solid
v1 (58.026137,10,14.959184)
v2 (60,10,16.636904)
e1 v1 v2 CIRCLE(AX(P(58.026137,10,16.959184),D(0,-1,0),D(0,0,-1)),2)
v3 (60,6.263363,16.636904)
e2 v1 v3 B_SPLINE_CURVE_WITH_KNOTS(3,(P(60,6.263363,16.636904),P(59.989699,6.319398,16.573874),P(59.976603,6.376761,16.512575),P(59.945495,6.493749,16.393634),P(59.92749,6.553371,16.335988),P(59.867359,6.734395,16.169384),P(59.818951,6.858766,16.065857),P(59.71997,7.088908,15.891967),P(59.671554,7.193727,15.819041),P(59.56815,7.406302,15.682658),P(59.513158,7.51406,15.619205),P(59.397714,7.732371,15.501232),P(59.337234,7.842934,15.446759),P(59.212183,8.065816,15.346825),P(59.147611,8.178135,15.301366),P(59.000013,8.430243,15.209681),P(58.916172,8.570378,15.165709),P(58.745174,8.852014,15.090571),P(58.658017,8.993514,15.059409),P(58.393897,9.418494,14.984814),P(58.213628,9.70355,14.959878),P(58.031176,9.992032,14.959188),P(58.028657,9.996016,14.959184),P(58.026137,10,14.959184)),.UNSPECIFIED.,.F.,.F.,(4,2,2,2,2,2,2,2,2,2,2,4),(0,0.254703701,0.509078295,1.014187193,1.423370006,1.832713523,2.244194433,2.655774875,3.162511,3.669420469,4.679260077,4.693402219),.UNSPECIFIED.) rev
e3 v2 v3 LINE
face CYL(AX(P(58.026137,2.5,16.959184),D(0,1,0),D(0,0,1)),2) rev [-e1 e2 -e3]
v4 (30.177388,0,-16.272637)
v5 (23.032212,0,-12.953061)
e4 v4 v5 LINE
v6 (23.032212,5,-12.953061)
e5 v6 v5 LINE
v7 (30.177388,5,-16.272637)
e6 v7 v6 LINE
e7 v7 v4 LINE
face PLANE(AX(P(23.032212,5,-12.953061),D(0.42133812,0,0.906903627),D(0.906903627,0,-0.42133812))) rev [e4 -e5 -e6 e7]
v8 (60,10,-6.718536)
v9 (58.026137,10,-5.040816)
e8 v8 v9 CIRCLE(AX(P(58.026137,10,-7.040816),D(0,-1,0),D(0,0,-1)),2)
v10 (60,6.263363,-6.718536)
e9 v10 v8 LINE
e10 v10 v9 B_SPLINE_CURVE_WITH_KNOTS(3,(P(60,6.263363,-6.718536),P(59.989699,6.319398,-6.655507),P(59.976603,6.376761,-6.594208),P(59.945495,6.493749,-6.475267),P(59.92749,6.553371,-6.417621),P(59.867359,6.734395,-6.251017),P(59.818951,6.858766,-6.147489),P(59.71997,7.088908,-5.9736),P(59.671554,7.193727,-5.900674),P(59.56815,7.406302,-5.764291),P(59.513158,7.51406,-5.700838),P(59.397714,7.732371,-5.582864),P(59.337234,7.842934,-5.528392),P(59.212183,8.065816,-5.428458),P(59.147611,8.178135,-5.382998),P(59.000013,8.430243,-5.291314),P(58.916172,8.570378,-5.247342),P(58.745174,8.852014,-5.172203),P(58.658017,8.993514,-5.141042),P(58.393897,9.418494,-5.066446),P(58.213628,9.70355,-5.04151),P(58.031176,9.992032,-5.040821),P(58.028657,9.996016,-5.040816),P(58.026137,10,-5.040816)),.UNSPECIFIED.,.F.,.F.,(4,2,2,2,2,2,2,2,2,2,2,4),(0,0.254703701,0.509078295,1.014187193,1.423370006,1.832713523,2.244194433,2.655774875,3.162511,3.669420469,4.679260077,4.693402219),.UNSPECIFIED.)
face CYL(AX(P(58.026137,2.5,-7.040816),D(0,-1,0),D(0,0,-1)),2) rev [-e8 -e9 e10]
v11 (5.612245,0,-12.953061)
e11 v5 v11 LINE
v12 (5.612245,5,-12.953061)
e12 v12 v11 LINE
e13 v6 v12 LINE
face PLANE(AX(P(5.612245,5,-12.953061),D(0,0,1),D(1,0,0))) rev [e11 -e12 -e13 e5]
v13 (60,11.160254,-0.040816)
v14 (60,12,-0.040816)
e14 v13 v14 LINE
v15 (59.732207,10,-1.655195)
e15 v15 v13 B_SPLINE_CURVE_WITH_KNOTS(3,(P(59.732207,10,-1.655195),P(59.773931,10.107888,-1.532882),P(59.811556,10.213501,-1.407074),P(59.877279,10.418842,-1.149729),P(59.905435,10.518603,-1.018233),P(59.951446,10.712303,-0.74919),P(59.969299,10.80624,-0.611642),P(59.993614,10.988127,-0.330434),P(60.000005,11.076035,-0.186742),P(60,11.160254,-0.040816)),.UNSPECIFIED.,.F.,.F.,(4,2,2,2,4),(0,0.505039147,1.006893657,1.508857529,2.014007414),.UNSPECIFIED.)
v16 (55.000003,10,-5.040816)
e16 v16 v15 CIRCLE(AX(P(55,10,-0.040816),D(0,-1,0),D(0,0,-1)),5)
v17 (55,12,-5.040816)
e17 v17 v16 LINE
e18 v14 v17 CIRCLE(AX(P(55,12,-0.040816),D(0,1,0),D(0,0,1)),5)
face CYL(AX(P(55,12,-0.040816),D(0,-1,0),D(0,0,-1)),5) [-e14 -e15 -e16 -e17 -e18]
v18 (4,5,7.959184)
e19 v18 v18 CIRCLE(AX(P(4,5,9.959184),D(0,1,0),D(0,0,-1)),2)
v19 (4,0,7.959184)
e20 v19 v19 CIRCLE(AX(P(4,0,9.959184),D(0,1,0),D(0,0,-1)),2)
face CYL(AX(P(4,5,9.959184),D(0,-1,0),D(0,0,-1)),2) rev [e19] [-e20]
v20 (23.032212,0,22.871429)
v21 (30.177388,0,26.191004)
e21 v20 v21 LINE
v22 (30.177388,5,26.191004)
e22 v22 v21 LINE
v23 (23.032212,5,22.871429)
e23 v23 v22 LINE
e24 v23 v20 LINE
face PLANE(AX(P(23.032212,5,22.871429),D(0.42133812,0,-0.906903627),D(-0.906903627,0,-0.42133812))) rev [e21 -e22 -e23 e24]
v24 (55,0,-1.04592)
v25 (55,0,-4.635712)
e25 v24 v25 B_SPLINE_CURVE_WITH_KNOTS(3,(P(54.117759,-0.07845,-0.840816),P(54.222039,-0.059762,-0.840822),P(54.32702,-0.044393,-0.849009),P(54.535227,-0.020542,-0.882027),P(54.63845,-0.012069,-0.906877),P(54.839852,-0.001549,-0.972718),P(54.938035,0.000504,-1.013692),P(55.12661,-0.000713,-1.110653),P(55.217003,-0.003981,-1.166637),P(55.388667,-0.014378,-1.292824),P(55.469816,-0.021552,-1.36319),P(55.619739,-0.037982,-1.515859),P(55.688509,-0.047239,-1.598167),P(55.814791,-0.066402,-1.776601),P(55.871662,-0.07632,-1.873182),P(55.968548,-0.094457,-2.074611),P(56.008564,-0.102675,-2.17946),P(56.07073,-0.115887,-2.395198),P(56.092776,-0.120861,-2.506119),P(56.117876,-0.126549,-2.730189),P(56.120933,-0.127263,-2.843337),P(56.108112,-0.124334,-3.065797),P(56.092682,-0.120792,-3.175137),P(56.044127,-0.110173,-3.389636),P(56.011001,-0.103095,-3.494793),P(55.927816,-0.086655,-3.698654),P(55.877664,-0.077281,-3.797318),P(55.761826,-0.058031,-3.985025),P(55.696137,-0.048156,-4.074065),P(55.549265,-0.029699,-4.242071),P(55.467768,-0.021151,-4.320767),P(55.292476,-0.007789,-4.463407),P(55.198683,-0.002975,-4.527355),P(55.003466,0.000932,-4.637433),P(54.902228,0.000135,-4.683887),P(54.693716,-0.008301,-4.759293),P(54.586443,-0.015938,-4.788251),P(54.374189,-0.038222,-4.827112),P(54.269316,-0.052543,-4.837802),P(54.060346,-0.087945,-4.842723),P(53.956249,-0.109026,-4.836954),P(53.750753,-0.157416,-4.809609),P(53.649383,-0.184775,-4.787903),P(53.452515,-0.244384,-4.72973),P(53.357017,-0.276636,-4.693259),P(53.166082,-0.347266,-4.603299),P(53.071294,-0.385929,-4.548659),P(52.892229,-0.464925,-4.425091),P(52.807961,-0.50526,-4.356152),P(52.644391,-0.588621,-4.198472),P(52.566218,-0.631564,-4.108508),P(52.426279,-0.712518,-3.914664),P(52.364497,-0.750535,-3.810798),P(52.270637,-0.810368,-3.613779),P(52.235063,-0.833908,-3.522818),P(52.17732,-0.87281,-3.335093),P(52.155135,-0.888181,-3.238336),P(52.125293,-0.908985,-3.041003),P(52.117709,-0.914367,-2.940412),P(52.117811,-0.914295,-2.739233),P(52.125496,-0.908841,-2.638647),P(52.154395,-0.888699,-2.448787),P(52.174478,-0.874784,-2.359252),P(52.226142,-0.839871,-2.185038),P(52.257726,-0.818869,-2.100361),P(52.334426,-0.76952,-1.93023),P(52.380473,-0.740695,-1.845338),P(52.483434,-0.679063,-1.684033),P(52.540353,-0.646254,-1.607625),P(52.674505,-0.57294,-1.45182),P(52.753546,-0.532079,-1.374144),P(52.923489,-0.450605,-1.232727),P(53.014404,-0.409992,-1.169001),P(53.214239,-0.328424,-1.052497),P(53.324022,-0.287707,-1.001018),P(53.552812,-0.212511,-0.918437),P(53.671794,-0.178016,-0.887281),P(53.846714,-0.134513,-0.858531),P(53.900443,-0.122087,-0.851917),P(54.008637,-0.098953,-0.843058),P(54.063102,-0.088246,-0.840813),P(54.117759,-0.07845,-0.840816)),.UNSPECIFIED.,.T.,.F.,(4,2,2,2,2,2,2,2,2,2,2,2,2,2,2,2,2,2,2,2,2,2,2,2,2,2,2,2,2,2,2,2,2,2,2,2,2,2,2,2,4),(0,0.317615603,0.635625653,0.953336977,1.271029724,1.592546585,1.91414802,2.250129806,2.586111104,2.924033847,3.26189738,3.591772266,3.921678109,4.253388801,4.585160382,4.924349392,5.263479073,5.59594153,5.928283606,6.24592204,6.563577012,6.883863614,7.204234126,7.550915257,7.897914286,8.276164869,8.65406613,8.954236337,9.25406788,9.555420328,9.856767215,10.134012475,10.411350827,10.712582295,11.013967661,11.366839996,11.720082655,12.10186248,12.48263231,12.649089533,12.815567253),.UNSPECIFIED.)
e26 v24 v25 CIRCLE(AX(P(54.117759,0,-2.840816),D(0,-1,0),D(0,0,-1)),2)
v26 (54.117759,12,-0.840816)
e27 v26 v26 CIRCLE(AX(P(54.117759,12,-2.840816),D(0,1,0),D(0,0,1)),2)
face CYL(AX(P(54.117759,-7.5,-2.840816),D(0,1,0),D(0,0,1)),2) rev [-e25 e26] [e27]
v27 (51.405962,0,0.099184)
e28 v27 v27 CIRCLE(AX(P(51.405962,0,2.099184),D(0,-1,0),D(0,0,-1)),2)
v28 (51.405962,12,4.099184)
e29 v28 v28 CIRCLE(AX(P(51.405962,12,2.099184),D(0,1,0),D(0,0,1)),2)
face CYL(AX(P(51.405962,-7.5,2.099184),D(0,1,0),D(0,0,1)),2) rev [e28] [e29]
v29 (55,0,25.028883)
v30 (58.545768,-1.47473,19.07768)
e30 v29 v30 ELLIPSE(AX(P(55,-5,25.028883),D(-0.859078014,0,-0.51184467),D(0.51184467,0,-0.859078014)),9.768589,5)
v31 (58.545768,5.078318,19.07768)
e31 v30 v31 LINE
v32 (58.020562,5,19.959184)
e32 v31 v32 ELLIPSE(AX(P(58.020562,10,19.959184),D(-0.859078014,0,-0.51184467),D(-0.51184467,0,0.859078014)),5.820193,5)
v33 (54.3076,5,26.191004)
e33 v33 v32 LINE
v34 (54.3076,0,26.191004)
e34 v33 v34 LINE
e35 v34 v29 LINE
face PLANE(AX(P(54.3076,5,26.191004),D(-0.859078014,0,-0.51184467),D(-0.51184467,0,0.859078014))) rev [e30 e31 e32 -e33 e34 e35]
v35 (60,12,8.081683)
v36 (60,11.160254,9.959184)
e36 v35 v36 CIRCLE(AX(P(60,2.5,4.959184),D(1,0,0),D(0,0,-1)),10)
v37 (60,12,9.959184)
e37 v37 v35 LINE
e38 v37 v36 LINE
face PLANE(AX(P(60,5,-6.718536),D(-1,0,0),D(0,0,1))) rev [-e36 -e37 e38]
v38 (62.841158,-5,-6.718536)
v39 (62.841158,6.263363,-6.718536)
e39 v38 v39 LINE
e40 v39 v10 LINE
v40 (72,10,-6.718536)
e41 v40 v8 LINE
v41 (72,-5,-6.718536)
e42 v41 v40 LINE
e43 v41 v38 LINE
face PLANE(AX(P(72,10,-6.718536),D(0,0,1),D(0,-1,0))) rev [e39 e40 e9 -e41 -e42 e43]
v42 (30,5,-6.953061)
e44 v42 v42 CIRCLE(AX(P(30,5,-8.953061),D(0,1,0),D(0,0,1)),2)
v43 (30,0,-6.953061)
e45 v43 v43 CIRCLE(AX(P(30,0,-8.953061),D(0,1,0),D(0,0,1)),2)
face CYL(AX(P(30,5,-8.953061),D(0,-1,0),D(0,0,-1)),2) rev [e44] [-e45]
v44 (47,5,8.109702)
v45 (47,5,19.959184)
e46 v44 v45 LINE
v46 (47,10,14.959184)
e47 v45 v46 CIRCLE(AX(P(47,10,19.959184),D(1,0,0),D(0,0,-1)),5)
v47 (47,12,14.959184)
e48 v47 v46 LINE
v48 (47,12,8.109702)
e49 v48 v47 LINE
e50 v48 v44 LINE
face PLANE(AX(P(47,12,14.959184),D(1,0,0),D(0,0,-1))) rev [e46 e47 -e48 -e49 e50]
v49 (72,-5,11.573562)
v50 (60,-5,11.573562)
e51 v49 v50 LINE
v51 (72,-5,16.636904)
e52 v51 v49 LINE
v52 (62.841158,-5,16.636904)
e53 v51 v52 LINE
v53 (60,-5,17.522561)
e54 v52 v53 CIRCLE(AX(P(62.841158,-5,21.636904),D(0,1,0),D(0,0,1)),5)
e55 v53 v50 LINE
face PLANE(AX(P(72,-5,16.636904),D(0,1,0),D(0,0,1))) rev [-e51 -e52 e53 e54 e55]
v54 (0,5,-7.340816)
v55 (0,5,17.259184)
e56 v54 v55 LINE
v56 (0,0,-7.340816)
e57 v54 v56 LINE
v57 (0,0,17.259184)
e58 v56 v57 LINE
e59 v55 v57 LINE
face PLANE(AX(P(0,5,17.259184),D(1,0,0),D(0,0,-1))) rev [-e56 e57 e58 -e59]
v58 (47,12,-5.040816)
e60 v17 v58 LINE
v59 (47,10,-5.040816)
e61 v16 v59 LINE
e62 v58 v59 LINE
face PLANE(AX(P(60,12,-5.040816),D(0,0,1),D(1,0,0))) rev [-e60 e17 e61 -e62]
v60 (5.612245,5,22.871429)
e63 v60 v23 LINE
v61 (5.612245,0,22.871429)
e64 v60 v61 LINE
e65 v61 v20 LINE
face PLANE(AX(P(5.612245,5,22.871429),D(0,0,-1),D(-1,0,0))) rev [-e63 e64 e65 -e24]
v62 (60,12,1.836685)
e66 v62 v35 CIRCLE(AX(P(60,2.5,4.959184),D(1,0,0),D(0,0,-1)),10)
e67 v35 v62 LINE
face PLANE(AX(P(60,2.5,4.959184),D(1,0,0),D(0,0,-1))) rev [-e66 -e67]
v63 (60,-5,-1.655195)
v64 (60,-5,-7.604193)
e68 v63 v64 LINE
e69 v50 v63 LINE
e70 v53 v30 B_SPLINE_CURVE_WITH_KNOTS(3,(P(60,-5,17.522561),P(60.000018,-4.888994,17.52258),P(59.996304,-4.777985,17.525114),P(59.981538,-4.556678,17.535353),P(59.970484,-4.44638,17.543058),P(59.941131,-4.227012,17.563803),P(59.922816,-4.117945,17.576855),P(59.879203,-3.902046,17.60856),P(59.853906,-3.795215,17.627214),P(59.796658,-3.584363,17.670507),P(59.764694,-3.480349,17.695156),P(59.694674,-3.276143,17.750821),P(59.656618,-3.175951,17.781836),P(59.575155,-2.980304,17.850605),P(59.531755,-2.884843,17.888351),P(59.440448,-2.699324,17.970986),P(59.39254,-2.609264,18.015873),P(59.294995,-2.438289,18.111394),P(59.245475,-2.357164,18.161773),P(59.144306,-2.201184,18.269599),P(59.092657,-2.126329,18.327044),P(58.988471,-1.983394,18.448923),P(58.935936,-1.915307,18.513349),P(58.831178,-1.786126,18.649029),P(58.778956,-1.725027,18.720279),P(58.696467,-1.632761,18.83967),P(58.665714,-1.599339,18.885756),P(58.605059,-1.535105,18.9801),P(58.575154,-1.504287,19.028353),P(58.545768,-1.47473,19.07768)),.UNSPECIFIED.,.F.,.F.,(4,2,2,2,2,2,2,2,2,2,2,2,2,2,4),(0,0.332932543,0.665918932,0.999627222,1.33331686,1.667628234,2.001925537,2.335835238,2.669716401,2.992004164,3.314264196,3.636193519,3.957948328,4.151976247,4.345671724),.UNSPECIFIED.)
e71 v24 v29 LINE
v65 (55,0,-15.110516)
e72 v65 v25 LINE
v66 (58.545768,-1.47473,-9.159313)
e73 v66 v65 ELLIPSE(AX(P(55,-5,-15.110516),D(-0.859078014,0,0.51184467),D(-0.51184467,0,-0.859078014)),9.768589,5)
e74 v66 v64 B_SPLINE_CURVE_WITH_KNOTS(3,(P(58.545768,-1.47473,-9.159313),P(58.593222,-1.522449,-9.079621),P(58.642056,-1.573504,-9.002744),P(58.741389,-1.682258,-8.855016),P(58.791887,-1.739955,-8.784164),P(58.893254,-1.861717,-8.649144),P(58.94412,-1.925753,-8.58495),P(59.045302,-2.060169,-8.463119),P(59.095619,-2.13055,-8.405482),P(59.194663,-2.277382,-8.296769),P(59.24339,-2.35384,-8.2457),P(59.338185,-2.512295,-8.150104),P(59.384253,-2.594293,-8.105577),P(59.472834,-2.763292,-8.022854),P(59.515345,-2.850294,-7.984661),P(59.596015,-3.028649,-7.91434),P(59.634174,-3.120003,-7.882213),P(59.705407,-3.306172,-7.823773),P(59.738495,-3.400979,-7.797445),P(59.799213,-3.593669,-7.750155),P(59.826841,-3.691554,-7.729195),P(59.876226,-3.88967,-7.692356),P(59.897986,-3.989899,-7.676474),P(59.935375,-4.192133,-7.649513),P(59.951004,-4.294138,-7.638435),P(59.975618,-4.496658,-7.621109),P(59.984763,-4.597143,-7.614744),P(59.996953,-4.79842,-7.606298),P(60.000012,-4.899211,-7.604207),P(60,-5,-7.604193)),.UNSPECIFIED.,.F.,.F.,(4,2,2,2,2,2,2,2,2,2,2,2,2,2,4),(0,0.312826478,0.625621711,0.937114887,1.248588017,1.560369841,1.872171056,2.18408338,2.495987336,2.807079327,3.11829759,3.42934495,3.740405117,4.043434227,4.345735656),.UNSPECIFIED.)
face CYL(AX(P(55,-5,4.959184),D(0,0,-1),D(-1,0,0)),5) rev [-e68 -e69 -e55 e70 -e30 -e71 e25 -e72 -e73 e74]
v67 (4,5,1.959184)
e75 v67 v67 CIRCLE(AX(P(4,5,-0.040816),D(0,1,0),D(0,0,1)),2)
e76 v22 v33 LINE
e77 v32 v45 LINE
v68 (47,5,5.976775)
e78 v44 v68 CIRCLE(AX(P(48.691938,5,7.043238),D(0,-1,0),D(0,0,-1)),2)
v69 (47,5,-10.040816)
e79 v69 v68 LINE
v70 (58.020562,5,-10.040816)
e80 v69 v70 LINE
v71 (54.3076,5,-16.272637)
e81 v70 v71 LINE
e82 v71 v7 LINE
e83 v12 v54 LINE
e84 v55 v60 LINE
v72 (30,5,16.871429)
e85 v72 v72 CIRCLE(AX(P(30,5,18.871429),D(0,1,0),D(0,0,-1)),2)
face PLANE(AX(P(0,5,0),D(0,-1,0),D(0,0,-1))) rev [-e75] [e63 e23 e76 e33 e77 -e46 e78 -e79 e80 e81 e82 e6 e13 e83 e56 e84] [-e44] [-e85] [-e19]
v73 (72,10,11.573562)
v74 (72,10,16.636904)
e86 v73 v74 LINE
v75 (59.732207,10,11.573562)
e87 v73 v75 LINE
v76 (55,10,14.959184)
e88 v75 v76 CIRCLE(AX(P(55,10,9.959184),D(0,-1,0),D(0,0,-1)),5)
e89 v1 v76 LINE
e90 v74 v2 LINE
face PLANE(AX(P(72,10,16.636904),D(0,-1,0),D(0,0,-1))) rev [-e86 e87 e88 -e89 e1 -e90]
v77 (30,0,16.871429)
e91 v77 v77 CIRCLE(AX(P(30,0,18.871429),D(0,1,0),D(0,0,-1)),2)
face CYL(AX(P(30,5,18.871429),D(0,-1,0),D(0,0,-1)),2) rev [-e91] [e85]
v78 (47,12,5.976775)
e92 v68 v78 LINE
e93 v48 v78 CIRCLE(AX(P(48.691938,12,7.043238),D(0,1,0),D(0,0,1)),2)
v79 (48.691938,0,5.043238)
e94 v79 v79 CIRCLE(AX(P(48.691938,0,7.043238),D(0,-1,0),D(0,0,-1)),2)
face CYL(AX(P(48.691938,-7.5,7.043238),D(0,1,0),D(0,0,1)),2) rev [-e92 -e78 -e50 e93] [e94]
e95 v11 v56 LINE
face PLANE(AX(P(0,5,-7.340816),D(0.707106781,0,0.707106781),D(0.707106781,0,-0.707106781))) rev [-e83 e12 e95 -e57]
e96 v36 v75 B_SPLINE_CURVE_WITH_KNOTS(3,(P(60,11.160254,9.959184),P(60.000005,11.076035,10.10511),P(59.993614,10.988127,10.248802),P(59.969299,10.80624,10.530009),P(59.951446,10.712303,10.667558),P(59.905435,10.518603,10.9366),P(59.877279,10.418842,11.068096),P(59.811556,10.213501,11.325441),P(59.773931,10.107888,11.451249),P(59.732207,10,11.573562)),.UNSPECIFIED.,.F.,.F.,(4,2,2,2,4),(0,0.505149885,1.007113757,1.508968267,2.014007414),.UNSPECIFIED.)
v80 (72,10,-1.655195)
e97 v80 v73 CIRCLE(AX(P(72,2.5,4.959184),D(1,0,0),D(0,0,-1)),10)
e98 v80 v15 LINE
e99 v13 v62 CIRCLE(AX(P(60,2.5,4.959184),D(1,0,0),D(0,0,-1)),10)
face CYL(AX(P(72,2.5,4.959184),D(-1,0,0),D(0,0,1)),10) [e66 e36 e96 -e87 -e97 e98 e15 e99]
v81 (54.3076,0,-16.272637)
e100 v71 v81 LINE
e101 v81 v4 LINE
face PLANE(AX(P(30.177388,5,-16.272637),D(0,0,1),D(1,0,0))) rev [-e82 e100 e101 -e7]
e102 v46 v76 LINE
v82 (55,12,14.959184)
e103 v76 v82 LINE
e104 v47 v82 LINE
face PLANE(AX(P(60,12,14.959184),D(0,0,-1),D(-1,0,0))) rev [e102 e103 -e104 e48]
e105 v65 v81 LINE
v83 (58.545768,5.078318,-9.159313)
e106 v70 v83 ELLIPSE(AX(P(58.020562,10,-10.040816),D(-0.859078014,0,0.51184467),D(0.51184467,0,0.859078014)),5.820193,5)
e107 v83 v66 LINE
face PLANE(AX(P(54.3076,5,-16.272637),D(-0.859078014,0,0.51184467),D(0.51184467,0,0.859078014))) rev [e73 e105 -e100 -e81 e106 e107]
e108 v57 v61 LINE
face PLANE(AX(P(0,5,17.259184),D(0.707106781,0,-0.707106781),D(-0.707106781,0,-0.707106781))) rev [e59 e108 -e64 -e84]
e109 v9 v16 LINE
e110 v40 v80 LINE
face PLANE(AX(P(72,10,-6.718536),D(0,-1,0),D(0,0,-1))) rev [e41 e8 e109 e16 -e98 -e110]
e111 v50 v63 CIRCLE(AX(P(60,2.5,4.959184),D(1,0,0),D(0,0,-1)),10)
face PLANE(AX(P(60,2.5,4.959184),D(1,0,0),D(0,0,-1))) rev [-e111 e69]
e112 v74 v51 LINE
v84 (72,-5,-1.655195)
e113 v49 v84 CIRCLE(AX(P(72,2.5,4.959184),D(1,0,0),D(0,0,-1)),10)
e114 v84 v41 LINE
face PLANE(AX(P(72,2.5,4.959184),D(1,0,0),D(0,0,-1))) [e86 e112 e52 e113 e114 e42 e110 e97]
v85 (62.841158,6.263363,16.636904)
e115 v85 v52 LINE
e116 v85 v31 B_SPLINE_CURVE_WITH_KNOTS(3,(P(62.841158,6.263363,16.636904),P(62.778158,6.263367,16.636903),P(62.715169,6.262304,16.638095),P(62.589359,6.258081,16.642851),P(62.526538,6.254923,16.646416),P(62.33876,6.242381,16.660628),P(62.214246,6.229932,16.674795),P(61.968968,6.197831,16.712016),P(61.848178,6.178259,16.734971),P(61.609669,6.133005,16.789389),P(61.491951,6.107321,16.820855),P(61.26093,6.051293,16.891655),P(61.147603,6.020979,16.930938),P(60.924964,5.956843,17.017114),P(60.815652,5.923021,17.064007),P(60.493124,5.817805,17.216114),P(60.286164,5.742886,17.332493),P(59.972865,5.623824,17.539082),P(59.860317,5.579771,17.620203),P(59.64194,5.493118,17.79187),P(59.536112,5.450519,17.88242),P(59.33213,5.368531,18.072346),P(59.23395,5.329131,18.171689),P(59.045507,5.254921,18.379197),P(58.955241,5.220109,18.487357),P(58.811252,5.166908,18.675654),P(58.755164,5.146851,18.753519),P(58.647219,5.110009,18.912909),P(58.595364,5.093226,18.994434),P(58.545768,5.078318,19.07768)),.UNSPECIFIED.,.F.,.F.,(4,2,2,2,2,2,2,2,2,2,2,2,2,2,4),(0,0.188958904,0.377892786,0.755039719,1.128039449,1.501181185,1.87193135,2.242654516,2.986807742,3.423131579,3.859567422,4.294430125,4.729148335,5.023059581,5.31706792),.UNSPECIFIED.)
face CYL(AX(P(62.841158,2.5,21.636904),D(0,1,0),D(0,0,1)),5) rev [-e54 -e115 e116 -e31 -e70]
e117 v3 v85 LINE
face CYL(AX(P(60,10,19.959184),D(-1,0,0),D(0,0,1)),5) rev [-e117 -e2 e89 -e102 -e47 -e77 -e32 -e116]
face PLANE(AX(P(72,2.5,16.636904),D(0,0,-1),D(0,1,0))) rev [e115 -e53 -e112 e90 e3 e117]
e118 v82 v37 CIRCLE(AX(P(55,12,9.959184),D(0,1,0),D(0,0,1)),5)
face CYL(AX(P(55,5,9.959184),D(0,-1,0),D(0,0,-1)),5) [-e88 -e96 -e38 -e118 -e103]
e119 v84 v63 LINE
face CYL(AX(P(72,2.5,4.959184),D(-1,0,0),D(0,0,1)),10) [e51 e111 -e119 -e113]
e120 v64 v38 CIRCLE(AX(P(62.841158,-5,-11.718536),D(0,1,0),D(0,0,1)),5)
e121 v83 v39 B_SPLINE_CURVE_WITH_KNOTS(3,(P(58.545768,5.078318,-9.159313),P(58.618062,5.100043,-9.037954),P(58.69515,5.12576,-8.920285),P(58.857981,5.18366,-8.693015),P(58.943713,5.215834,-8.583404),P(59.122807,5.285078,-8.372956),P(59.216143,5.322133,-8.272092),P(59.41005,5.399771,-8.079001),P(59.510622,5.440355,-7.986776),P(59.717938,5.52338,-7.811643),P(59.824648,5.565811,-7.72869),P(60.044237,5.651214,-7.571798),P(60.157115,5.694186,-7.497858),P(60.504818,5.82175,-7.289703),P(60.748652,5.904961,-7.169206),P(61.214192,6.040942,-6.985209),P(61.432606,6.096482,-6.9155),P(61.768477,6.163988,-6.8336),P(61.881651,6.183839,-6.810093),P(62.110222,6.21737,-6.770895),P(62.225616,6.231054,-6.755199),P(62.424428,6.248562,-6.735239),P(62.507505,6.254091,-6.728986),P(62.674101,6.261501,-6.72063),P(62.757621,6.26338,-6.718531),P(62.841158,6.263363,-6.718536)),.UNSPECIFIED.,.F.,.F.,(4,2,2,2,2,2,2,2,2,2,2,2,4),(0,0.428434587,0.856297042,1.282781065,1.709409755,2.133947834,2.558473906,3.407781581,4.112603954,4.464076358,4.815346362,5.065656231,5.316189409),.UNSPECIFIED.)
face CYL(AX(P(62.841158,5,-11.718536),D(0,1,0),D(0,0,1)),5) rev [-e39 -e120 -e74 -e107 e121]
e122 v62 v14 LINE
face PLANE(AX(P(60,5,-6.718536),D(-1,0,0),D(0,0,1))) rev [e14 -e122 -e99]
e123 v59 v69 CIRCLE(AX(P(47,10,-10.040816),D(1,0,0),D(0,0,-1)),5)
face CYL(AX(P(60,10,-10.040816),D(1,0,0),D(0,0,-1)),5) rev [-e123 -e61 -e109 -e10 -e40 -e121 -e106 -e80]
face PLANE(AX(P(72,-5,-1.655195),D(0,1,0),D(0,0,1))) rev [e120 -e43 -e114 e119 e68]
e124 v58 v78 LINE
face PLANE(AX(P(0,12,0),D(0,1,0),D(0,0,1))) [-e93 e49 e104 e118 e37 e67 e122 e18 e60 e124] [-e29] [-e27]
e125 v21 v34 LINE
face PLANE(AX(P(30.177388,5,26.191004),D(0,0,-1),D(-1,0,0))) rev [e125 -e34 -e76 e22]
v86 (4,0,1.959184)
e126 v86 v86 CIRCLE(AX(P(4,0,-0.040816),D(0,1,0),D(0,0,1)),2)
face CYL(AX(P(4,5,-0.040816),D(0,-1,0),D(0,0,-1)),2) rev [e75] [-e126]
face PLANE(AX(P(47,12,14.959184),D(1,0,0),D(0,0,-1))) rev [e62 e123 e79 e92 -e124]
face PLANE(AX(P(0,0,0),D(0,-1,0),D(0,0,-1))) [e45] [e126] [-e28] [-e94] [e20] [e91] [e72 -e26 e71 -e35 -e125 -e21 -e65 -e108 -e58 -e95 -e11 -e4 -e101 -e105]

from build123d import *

# Parameters (mm, degrees)
ESQUISSE1_R             = 2.0000000000000004
ESQUISSE1_R_2           = 2.0000000000000027
ESQUISSE1_R_3           = 2.0000000000000036
BOSS_EXTRU_1_DEPTH      = 5
BOSS_EXTRU_2_DEPTH      = 7
BOSS_EXTRU_3_DEPTH      = 12
CONG_5_R                = 2
CONG_6_R                = 5
CONG_7_R                = 5
CONG_8_START            = 47
CONG_8_DEPTH            = 15.841158425
CONG_8_START_2          = 5
CONG_8_2_DEPTH          = 5
CONG_9_R                = 5
ESQUISSE4_R             = 2.000000000000003
ENL_V_MAT_EXTRU_1_DEPTH = 80.05832474405705


with BuildPart() as part:
    # Esquisse1 → Boss.-Extru.1 (new body)
    with BuildSketch(Plane(origin=(0, 0, 0), x_dir=(1, 0, 0), z_dir=(0, 1, 0))):
        Polygon((0, -17.259183673469387), (0, 7.340816326530612), (5.612244897959183, 12.953061224489796), (23.032211874798815, 12.953061224489796), (30.177388078602107, 16.27263677540768), (54.30760037473541, 16.27263677540768), (60, 6.7185363720326), (60, -16.636903718971652), (54.30760037473541, -26.19100412234673), (30.177388078602107, -26.19100412234673), (23.032211874798815, -22.87142857142884), (5.612244897959183, -22.87142857142857), align=None)
        with Locations(Location((4, 0.04081632653047534, 0), (0, 0, 270))):
            Circle(ESQUISSE1_R, mode=Mode.SUBTRACT)
        with Locations(Location((30, 8.953061224489796, 0), (0, 0, 270))):
            Circle(ESQUISSE1_R_2, mode=Mode.SUBTRACT)
        with Locations(Location((30, -18.871428571428574, 0), (0, 0, 90))):
            Circle(ESQUISSE1_R_3, mode=Mode.SUBTRACT)
        with Locations(Location((4, -9.959183673469525, 0), (0, 0, 90))):
            Circle(ESQUISSE1_R, mode=Mode.SUBTRACT)
    extrude(amount=BOSS_EXTRU_1_DEPTH)

    # Esquisse2 → Boss.-Extru.2 (add)
    with BuildSketch(Plane(origin=(0, 5, 0), x_dir=(1, 0, 0), z_dir=(0, 1, 0))):
        Polygon((60, -14.959183673469527), (47, -14.959183673469527), (47, 5.040816326530476), (60, 5.040816326530474), align=None)
    extrude(amount=BOSS_EXTRU_2_DEPTH)

    # Esquisse3 → Boss.-Extru.3 (add)
    with BuildSketch(Plane(origin=(60, 0, 0), x_dir=(0, 0, -1), z_dir=(1, 0, 0))):
        with BuildLine():
            Line((-16.636903718971652, 2.5), (-16.636903718971656, 10))
            Line((-16.636903718971656, 10), (-11.573561951131, 10))
            ThreePointArc((-11.573561951131, 10), (-4.959183673469523, 12.5), (1.655194604191953, 10))
            Line((1.655194604191953, 10), (6.7185363720326015, 10))
            Line((6.7185363720326015, 10), (6.7185363720326, 2.5))
            Line((6.7185363720326, 2.5), (6.7185363720326015, -4.999999999999996))
            Line((6.7185363720326015, -4.999999999999996), (1.6551946041919556, -4.9999999999999964))
            ThreePointArc((1.6551946041919556, -4.9999999999999964), (-4.959183673469523, -7.5), (-11.573561951131001, -4.999999999999998))
            Line((-11.573561951131001, -4.999999999999998), (-16.636903718971652, -4.999999999999999))
            Line((-16.636903718971652, -4.999999999999999), (-16.636903718971652, 2.5))
        make_face()
    extrude(amount=BOSS_EXTRU_3_DEPTH)

    # Congé5
    # the kernel refuses this fillet: 2 mm, written as the material it adds along each edge
    with BuildSketch(Plane(origin=(60, 0.06534219085981618, -5.040816326530474), x_dir=(-1, 0, 0), z_dir=(0, 1, 0))) as cong_5_piece_1:
        with BuildLine():
            CenterArc((1.9738631236560735, -2), CONG_5_R, 90, 80.72692923904819)
            Line((1.1369e-13, -1.677720045502146), (0, 0))
            Line((0, 0), (1.9738631236560735, 0))
        make_face()
    extrude(amount=9.934657809140184)
    with BuildSketch(Plane(origin=(60, 0.06534219085972737, 14.959183673469527), x_dir=(-8.894e-14, 0, 1), z_dir=(0, 1, 0))) as cong_5_piece_2:
        with BuildLine():
            CenterArc((2.0000000000001736, -1.9738631236559312), CONG_5_R, 99.27307076095664, 80.72692923904845)
            Line((1.7378e-13, -1.973863123656109), (0, 0))
            Line((0, 0), (1.677720045502154, 0))
        make_face()
    extrude(amount=9.934657809140273)

    # Congé6
    # the kernel refuses this fillet: 5 mm, written as the material it adds along each edge
    with BuildSketch(Plane(origin=(60, 0, -19.2185363720326), x_dir=(0, -1, 0), z_dir=(0, 0, 1))) as cong_6_piece_1_section:
        with BuildLine():
            CenterArc((CONG_6_R, -CONG_6_R), CONG_6_R, 90, 90)
            Line((0, -CONG_6_R), (0, 0))
            Line((0, 0), (CONG_6_R, 0))
        make_face()
    cong_6_piece_1 = extrude(amount=48.35544009100425, mode=Mode.PRIVATE)
    cong_6_piece_1 = split(cong_6_piece_1, bisect_by=Plane(origin=(54.50356872133156, 0, -15.943724298681133), z_dir=(-0.8590780139963325, 0, 0.5118446696685599)), keep=Keep.TOP, mode=Mode.PRIVATE)
    cong_6_piece_1 = split(cong_6_piece_1, bisect_by=Plane(origin=(75.76615699412946, 0, -9.824950123604522), z_dir=(-0.8590780139963324, 0, -0.5118446696685601)), keep=Keep.TOP, mode=Mode.PRIVATE)
    add(cong_6_piece_1)

    # Congé7
    cong_7_edges = [part.edges().sort_by_distance(p)[0] for p in [
        (60, 0, 16.636903718954546),
        (60, 0, -6.718536372036638),
    ]]
    fillet(cong_7_edges, radius=CONG_7_R)

    # Congé8: read off the stored shape, not the designer's step
    # Congé8 outline → Congé8 (add)
    with BuildSketch(Plane.YZ.offset(CONG_8_START)):
        with BuildLine():
            Line((5, 14.959183673), (10, 14.959183673))
            ThreePointArc((10, 14.959183673), (6.464466095, 16.423649767), (5, 19.959183673))
            Line((5, 19.959183673), (5, 14.959183673))
        make_face()
        with BuildLine():
            Line((10, -5.040816327), (5, -5.040816327))
            Line((5, -5.040816327), (5, -10.040816327))
            ThreePointArc((5, -10.040816327), (6.464466094, -6.505282421), (10, -5.040816327))
        make_face()
    extrude(amount=CONG_8_DEPTH)

    # Cong_8 2 outline → Cong_8 2 (cut)
    with BuildSketch(Plane(origin=(0, 0, 0), x_dir=(1, 0, 0), z_dir=(0, 1, 0)).offset(CONG_8_START_2)):
        with BuildLine():
            Line((62.841158425, -21), (62.841158325, -16.636903719))
            ThreePointArc((62.841158325, -16.636903719), (60.370947478, -17.289714009), (58.545768255, -19.077680371))
            Line((58.545768255, -19.077680371), (57.40043682, -21))
            Line((57.40043682, -21), (62.841158425, -21))
        make_face()
        with BuildLine():
            Line((57, 12), (57, 11.753724185))
            Line((57, 11.753724185), (58.545768255, 9.159313024))
            ThreePointArc((58.545768255, 9.159313024), (60.370947478, 7.371346662), (62.841158325, 6.718536372))
            Line((62.841158325, 6.718536372), (62.841158425, 12))
            Line((62.841158425, 12), (57, 12))
        make_face()
    extrude(amount=CONG_8_2_DEPTH, mode=Mode.SUBTRACT)

    # Congé9
    # the kernel refuses this fillet: 5 mm, written as the material it takes off along each edge
    with BuildSketch(Plane(origin=(60, 10, 14.959183673469527), x_dir=(-1, 0, 0), z_dir=(0, 1, 0))) as cong_9_piece_1_section:
        with BuildLine():
            CenterArc((CONG_9_R, -CONG_9_R), CONG_9_R, 90, 89.99999999999997)
            Line((0, -CONG_9_R), (0, 0))
            Line((0, 0), (CONG_9_R, 0))
        make_face()
    cong_9_piece_1 = extrude(amount=14.5, mode=Mode.PRIVATE)
    cong_9_piece_1 = cong_9_piece_1 - Plane(origin=(60, 2.5, 4.959183673469523), x_dir=(0, 0.75, 0.6614378277661477), z_dir=(-1, 0, 0)) * Cylinder(10, 49, mode=Mode.PRIVATE)
    add(cong_9_piece_1, mode=Mode.SUBTRACT)
    with BuildSketch(Plane(origin=(60, 10, -5.040816326530474), x_dir=(0, 0, 1), z_dir=(0, 1, 0))) as cong_9_piece_2_section:
        with BuildLine():
            CenterArc((CONG_9_R, -CONG_9_R), CONG_9_R, 90, 90)
            Line((-8.9e-16, -CONG_9_R), (0, 0))
            Line((0, 0), (CONG_9_R, 0))
        make_face()
    cong_9_piece_2 = extrude(amount=14.5, mode=Mode.PRIVATE)
    cong_9_piece_2 = cong_9_piece_2 - Plane(origin=(60, 2.5, 4.959183673469523), x_dir=(0, 0.75, 0.6614378277661477), z_dir=(-1, 0, 0)) * Cylinder(10, 49, mode=Mode.PRIVATE)
    add(cong_9_piece_2, mode=Mode.SUBTRACT)

    # Esquisse4 → Enlèv. mat.-Extru.1 (cut, through all)
    with BuildSketch(Plane(origin=(0, 12, 0), x_dir=(1, 0, 0), z_dir=(0, 1, 0))):
        with Locations(Location((54.117759478937174, 2.840816326530474, 0), (0, 0, 270))):
            Circle(ESQUISSE4_R)
        with Locations(Location((51.40596187001204, -2.099183673469524, 0), (0, 0, 270))):
            Circle(ESQUISSE4_R)
        with Locations(Location((48.691938447086365, -7.043238371772405, 0), (0, 0, 212.224070666))):
            Circle(ESQUISSE4_R)
    extrude(amount=-ENL_V_MAT_EXTRU_1_DEPTH, mode=Mode.SUBTRACT)


solid = part.part
